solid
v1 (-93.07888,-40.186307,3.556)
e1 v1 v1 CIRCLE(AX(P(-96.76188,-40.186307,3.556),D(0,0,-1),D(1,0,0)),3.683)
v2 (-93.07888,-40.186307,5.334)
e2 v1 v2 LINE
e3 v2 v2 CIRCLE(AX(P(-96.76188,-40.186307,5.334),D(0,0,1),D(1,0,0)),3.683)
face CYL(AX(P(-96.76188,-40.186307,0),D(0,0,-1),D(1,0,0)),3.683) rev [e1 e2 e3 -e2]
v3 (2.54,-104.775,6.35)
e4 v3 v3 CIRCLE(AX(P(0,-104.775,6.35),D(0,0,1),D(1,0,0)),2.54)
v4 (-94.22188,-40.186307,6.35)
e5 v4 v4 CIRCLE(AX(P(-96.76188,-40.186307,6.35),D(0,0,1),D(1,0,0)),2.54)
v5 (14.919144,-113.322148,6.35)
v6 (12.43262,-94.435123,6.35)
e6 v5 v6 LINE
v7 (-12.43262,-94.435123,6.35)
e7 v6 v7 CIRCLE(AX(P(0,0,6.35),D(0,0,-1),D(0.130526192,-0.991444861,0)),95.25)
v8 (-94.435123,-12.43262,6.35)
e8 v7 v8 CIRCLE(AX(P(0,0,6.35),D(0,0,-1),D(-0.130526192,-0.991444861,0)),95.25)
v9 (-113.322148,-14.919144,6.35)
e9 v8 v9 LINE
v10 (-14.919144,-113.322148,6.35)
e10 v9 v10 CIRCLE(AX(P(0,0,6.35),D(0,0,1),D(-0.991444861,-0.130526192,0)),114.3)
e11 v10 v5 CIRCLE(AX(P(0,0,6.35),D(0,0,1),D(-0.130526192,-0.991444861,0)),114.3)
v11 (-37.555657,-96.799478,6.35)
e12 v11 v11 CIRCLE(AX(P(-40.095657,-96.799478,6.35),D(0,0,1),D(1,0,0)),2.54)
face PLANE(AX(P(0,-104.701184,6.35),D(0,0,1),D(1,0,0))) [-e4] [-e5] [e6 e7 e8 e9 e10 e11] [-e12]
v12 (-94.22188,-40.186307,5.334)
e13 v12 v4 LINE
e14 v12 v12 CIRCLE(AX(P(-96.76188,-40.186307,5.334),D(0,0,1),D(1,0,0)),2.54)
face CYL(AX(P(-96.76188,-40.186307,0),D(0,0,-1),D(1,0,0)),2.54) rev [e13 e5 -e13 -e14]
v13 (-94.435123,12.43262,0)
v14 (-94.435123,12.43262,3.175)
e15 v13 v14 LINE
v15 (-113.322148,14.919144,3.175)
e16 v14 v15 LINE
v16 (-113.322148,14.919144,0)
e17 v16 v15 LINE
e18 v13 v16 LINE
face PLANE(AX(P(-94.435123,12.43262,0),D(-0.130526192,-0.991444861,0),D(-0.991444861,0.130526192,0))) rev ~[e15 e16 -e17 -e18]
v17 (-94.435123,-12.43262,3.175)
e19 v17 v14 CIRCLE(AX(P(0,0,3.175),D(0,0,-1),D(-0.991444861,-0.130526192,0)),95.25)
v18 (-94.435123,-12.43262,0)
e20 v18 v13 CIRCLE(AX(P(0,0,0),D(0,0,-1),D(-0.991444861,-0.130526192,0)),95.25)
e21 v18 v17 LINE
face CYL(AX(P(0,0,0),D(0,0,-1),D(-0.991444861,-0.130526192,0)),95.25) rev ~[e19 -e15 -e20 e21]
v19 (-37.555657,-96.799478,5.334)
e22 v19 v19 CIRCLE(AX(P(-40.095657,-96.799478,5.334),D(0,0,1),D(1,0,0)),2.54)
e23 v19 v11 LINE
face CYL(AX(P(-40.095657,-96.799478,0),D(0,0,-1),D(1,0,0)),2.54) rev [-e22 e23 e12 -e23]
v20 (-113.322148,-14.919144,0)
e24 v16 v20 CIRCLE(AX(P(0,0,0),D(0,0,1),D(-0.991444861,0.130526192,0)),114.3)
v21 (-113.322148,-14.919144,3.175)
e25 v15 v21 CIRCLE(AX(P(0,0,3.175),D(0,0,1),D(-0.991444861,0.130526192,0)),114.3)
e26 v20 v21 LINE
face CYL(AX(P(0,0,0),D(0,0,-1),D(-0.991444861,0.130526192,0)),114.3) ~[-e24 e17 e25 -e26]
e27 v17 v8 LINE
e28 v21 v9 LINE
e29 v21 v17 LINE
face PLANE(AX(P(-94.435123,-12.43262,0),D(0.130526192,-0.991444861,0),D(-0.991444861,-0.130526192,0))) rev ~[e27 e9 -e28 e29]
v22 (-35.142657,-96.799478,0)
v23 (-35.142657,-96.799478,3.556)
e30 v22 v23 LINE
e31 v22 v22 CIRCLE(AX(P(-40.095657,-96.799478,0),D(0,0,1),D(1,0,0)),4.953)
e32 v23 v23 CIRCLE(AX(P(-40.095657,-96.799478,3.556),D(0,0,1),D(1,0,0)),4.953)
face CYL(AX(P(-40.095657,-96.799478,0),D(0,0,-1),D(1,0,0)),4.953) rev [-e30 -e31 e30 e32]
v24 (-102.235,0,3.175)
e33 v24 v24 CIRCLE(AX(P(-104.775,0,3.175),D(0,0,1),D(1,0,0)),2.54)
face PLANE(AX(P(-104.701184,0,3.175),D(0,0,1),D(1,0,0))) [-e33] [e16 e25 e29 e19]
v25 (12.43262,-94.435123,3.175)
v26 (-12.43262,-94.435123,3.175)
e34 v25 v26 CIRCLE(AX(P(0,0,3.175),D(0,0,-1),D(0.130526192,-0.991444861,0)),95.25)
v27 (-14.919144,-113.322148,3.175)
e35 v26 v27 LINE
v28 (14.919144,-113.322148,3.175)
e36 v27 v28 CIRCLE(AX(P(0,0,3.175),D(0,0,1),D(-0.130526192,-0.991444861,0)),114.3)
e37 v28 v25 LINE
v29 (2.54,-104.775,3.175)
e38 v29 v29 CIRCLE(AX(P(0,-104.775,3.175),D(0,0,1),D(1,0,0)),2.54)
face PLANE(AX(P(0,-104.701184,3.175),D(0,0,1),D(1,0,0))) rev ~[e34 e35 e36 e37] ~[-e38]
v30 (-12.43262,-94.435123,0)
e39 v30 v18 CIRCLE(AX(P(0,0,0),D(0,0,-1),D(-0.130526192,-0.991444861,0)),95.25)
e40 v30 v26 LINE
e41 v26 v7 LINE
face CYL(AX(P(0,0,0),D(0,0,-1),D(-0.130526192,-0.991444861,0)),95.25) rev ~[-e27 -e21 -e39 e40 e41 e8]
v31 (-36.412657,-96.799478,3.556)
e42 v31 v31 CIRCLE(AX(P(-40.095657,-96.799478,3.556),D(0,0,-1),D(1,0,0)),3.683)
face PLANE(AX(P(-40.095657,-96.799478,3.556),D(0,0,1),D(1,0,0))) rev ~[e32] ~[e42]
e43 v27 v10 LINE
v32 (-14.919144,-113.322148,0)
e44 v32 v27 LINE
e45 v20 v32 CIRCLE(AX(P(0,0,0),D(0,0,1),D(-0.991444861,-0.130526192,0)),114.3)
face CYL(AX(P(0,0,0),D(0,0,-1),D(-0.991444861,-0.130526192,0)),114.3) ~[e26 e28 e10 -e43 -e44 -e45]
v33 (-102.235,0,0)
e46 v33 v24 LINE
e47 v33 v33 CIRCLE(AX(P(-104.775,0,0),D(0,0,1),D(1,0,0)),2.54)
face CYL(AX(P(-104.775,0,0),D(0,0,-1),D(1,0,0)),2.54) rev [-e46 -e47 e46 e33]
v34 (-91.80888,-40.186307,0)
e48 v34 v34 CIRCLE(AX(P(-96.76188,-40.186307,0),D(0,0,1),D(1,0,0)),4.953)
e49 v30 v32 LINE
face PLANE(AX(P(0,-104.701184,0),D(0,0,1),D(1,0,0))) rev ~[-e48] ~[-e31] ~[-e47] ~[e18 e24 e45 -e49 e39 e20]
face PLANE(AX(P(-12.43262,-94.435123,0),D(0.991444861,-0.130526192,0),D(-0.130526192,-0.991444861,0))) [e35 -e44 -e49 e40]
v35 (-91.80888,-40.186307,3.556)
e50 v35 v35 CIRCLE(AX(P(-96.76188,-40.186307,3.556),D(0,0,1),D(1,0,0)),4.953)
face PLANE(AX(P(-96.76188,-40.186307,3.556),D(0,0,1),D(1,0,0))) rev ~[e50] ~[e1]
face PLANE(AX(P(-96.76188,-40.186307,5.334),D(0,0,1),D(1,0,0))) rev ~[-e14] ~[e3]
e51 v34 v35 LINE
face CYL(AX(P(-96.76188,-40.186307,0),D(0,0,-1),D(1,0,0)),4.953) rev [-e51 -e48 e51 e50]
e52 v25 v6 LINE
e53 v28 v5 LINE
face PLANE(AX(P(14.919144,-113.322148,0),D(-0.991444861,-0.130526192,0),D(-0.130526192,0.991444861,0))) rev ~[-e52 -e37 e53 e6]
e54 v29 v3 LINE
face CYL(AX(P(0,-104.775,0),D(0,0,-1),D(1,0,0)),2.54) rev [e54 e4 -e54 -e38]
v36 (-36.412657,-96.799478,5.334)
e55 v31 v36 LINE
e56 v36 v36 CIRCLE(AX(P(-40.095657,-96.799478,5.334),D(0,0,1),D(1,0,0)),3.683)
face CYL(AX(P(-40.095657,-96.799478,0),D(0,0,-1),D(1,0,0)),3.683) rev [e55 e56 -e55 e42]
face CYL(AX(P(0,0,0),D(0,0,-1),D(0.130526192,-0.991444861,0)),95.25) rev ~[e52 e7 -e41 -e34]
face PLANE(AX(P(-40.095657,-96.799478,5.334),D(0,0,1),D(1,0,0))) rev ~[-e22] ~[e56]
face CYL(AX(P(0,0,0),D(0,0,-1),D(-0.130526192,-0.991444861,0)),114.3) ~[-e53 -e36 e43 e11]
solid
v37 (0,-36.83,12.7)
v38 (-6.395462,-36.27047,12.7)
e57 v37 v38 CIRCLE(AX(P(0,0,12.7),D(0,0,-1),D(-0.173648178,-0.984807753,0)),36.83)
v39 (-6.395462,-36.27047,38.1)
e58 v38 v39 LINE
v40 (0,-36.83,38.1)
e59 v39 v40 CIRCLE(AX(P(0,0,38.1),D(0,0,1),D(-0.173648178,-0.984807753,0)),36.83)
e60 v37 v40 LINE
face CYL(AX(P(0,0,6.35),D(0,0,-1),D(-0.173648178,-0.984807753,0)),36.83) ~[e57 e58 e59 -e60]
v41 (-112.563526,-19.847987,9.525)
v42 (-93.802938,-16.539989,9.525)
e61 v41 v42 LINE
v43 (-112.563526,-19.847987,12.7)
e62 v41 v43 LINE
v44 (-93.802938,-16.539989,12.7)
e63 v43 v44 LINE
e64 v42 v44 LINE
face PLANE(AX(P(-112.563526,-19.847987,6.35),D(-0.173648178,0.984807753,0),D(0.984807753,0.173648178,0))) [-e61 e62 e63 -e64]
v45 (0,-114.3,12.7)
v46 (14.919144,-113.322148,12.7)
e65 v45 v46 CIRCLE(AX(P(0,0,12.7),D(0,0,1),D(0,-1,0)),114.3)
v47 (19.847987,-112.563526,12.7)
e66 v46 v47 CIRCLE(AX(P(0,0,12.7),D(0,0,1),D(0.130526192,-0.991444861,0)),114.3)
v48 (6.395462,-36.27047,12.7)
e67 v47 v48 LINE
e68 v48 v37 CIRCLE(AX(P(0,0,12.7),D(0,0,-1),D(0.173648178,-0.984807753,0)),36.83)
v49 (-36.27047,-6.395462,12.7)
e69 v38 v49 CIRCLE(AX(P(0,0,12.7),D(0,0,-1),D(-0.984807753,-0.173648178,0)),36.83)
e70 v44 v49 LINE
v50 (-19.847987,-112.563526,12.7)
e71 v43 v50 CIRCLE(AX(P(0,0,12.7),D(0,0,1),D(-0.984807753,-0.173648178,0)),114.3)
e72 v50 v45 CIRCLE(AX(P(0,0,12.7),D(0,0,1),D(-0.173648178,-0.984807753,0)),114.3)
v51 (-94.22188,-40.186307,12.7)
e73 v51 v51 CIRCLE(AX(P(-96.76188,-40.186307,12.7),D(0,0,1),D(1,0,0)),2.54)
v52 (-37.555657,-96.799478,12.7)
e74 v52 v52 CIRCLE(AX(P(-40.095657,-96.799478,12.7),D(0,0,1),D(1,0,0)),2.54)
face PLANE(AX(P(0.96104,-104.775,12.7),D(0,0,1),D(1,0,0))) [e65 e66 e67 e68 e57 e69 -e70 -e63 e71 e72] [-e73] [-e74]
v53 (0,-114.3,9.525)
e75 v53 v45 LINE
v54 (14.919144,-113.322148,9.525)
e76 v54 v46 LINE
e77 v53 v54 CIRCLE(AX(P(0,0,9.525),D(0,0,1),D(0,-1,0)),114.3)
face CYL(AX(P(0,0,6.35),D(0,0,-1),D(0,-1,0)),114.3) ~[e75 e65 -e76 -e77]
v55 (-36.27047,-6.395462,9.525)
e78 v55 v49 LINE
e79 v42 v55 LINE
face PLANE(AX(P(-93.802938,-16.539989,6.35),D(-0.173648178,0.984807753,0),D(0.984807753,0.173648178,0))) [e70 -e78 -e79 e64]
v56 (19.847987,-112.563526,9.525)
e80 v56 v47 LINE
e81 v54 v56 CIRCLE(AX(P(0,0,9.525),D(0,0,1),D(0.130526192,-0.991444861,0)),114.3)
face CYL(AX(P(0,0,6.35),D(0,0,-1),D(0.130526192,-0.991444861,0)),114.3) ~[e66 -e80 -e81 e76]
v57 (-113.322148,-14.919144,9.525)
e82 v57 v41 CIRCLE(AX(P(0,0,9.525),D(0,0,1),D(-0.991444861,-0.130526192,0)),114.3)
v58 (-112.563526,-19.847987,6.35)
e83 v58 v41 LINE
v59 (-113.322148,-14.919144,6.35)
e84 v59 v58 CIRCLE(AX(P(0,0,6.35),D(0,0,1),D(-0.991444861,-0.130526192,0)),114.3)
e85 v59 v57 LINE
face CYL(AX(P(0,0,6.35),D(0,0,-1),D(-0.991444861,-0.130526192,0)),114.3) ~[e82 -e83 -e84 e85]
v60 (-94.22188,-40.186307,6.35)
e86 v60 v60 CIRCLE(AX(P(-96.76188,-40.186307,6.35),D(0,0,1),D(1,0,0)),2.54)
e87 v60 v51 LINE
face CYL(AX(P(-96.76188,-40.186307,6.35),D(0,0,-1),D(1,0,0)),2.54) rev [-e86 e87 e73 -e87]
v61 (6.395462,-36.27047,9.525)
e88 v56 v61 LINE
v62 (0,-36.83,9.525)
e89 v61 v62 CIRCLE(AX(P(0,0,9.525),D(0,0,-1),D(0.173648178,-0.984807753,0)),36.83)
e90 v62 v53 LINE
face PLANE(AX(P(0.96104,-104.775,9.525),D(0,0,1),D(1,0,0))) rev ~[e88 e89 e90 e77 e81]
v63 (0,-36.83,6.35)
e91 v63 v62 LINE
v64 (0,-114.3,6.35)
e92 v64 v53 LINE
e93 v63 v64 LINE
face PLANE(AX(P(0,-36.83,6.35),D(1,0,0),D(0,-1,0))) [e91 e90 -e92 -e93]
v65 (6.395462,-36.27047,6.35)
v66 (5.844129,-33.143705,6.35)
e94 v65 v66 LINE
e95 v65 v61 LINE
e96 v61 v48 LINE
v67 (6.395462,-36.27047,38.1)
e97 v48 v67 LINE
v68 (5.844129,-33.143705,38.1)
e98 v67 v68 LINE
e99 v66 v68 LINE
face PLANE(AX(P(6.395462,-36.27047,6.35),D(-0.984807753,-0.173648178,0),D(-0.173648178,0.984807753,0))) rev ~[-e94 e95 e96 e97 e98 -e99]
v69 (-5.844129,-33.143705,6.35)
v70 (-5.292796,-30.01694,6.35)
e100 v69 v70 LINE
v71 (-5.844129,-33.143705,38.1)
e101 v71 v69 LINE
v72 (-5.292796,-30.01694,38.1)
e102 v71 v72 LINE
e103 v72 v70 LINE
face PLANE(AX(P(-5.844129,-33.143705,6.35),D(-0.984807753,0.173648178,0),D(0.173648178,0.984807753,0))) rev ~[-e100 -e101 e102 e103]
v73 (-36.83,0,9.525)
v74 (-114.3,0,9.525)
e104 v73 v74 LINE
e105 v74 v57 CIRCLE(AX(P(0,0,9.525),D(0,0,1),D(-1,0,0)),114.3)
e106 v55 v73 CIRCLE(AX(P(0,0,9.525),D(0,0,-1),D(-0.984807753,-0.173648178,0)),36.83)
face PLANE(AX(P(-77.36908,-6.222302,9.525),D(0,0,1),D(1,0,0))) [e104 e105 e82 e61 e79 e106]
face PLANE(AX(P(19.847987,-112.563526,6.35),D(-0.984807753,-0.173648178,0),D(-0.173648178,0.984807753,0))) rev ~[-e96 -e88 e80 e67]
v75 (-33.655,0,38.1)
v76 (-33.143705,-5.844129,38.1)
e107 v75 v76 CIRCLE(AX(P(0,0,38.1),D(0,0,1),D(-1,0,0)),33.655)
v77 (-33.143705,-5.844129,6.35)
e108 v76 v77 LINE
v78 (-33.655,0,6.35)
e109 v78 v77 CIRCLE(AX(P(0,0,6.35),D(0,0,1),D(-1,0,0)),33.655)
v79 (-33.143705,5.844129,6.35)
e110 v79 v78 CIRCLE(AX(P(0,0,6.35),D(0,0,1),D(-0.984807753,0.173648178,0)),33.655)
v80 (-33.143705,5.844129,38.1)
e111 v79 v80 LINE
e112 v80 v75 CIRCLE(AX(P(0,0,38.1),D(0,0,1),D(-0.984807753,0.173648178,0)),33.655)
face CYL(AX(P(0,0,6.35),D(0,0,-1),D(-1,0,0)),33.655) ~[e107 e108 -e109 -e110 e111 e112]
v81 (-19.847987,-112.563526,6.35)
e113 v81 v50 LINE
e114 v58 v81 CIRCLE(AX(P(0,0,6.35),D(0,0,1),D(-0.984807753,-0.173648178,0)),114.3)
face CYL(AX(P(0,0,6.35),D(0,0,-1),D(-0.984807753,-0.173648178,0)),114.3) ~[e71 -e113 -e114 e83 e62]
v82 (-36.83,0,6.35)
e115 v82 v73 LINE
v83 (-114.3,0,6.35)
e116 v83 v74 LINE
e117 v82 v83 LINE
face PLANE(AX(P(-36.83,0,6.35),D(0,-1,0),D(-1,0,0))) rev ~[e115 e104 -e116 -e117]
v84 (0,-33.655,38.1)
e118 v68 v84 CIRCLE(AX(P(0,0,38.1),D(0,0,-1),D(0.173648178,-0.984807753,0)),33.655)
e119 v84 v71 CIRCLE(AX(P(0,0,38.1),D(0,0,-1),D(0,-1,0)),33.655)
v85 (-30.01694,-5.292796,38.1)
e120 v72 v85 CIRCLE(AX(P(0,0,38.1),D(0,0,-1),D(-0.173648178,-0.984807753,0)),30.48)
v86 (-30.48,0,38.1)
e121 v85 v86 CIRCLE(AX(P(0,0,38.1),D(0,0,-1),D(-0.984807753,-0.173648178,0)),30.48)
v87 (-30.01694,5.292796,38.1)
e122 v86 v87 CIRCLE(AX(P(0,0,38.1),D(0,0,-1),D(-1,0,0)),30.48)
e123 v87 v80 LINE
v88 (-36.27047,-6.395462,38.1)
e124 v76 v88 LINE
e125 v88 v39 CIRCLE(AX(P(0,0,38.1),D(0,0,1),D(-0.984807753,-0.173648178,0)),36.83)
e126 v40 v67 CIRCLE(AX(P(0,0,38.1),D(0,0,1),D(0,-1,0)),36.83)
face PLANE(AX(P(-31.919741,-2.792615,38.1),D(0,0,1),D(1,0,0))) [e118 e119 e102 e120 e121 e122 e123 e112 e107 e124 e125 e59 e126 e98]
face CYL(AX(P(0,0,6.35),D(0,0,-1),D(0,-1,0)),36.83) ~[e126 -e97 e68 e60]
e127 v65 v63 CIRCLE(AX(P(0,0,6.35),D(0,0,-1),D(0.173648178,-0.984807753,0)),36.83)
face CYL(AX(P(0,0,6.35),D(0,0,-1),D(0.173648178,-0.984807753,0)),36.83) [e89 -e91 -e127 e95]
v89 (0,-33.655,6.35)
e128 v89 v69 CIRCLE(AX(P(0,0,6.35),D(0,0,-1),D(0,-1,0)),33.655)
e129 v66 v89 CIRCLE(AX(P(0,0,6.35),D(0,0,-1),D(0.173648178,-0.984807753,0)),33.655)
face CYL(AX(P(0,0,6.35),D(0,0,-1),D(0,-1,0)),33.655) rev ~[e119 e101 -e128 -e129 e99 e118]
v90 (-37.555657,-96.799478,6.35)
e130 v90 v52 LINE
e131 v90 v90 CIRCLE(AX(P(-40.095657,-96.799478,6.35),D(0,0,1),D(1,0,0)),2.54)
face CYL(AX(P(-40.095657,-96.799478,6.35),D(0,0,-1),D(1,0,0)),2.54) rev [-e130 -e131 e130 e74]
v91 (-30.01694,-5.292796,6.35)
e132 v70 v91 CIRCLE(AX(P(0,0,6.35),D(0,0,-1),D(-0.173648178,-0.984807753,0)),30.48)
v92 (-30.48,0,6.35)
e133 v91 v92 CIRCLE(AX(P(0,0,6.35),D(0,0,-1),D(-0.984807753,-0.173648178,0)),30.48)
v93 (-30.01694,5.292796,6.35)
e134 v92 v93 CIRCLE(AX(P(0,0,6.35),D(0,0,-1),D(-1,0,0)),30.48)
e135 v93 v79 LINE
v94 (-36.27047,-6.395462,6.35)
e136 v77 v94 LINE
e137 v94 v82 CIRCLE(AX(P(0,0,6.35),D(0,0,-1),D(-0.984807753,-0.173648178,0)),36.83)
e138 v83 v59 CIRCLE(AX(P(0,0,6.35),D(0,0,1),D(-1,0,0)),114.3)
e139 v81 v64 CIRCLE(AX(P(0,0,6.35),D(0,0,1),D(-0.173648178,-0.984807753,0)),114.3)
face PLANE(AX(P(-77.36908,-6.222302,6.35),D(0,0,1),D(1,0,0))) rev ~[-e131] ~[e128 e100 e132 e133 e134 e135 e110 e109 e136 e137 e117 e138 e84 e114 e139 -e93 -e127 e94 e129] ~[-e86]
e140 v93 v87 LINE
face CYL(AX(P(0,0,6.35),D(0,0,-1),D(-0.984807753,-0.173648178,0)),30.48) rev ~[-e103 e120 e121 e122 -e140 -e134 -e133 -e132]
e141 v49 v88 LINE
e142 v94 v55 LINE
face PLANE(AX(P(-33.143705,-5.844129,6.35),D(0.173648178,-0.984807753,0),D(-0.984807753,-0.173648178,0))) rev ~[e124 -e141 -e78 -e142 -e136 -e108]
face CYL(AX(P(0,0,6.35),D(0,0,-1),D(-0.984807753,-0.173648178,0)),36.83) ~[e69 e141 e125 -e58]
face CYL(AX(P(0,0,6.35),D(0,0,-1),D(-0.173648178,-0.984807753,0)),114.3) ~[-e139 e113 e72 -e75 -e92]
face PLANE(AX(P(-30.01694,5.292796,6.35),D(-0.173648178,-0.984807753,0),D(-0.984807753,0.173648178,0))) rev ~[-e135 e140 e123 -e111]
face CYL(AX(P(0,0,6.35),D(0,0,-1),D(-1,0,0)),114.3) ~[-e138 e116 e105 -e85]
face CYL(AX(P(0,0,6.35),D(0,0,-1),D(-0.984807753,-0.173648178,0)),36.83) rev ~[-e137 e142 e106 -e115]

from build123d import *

# Parameters (mm, degrees)
F0_R      = 4.953
F0_R_2    = 3.683
F0_R_3    = 2.54
F1_DEPTH  = 6.35
F2_DEPTH  = 3.175
F3_DEPTH  = 6.35
F4_DEPTH  = 3.175
F5_DEPTH  = 3.556
F6_DEPTH  = 3.556
F7_DEPTH  = 5.334
F8_DEPTH  = 5.334
F9_DEPTH  = 25.4
F10_R     = 2.54
F11_DEPTH = 6.35
F12_DEPTH = 31.75
F13_DEPTH = 6.35
F14_DEPTH = 3.175
F15_DEPTH = 6.35
F16_DEPTH = 3.175


with BuildPart() as f1:
    # F0 (on Top) → F1 (new body)
    with BuildSketch(Plane.XY):
        with BuildLine():
            Line((-94.4351230459, -12.432619809), (-113.322147655, -14.9191437708))
            ThreePointArc((-113.322147655, -14.9191437708), (-80.8223050896, -80.8223050896), (-14.9191437708, -113.322147655))
            Line((-14.9191437708, -113.322147655), (-12.432619809, -94.4351230459))
            ThreePointArc((-12.432619809, -94.4351230459), (-67.351920908, -67.351920908), (-94.4351230459, -12.432619809))
        make_face()
        with Locations((-40.0956566261, -96.7994780189)):
            Circle(F0_R, mode=Mode.SUBTRACT)
        with Locations((-96.7618797455, -40.1863067863)):
            Circle(F0_R, mode=Mode.SUBTRACT)
        with Locations((-96.7618797455, -40.1863067863)):
            Circle(F0_R)
        with Locations((-96.7618797455, -40.1863067863)):
            Circle(F0_R_2, mode=Mode.SUBTRACT)
        with Locations((-96.7618797455, -40.1863067863)):
            Circle(F0_R_2)
        with Locations((-96.7618797455, -40.1863067863)):
            Circle(F0_R_3, mode=Mode.SUBTRACT)
        with Locations((-40.0956566261, -96.7994780189)):
            Circle(F0_R)
        with Locations((-40.0956566261, -96.7994780189)):
            Circle(F0_R_2, mode=Mode.SUBTRACT)
        with Locations((-40.0956566261, -96.7994780189)):
            Circle(F0_R_2)
        with Locations((-40.0956566261, -96.7994780189)):
            Circle(F0_R_3, mode=Mode.SUBTRACT)
    extrude(amount=F1_DEPTH)

    # F0 (on Top) → F2 (join)
    with BuildSketch(Plane.XY):
        with BuildLine():
            Line((-94.4351230459, 12.432619809), (-113.322147655, 14.9191437708))
            ThreePointArc((-113.322147655, 14.9191437708), (-114.3, 0), (-113.322147655, -14.9191437708))
            Line((-113.322147655, -14.9191437708), (-94.4351230459, -12.432619809))
            ThreePointArc((-94.4351230459, -12.432619809), (-95.25, 0), (-94.4351230459, 12.432619809))
        make_face()
        with Locations((-104.775, 0)):
            Circle(F0_R_3, mode=Mode.SUBTRACT)
    extrude(amount=F2_DEPTH)

    # F0 (on Top) → F3 (join)
    with BuildSketch(Plane.XY):
        with BuildLine():
            ThreePointArc((-14.9191437708, -113.322147655), (0, -114.3), (14.9191437708, -113.322147655))
            Line((14.9191437708, -113.322147655), (12.432619809, -94.4351230459))
            ThreePointArc((12.432619809, -94.4351230459), (0, -95.25), (-12.432619809, -94.4351230459))
            Line((-12.432619809, -94.4351230459), (-14.9191437708, -113.322147655))
        make_face()
        with Locations((0, -104.775)):
            Circle(F0_R_3, mode=Mode.SUBTRACT)
    extrude(amount=F3_DEPTH)

    # F0 (on Top) → F4 (cut)
    with BuildSketch(Plane.XY):
        with BuildLine():
            ThreePointArc((-14.9191437708, -113.322147655), (0, -114.3), (14.9191437708, -113.322147655))
            Line((14.9191437708, -113.322147655), (12.432619809, -94.4351230459))
            ThreePointArc((12.432619809, -94.4351230459), (0, -95.25), (-12.432619809, -94.4351230459))
            Line((-12.432619809, -94.4351230459), (-14.9191437708, -113.322147655))
        make_face()
        with Locations((0, -104.775)):
            Circle(F0_R_3, mode=Mode.SUBTRACT)
    extrude(amount=F4_DEPTH, mode=Mode.SUBTRACT)

    # F0 (on Top) → F5 (cut)
    with BuildSketch(Plane.XY):
        with Locations((-40.0956566261, -96.7994780189)):
            Circle(F0_R)
        with Locations((-40.0956566261, -96.7994780189)):
            Circle(F0_R_2, mode=Mode.SUBTRACT)
        with Locations((-40.0956566261, -96.7994780189)):
            Circle(F0_R_2)
        with Locations((-40.0956566261, -96.7994780189)):
            Circle(F0_R_3, mode=Mode.SUBTRACT)
    extrude(amount=F5_DEPTH, mode=Mode.SUBTRACT)

    # F0 (on Top) → F6 (cut)
    with BuildSketch(Plane.XY):
        with Locations((-96.7618797455, -40.1863067863)):
            Circle(F0_R)
        with Locations((-96.7618797455, -40.1863067863)):
            Circle(F0_R_2, mode=Mode.SUBTRACT)
        with Locations((-96.7618797455, -40.1863067863)):
            Circle(F0_R_2)
        with Locations((-96.7618797455, -40.1863067863)):
            Circle(F0_R_3, mode=Mode.SUBTRACT)
    extrude(amount=F6_DEPTH, mode=Mode.SUBTRACT)

    # F0 (on Top) → F7 (cut)
    with BuildSketch(Plane.XY):
        with Locations((-96.7618797455, -40.1863067863)):
            Circle(F0_R_2)
        with Locations((-96.7618797455, -40.1863067863)):
            Circle(F0_R_3, mode=Mode.SUBTRACT)
    extrude(amount=F7_DEPTH, mode=Mode.SUBTRACT)

    # F0 (on Top) → F8 (cut)
    with BuildSketch(Plane.XY):
        with Locations((-40.0956566261, -96.7994780189)):
            Circle(F0_R_2)
        with Locations((-40.0956566261, -96.7994780189)):
            Circle(F0_R_3, mode=Mode.SUBTRACT)
    extrude(amount=F8_DEPTH, mode=Mode.SUBTRACT)

    # F0 (on Top) → F9 (cut)
    with BuildSketch(Plane.XY):
        with Locations((-96.7618797455, -40.1863067863)):
            Circle(F0_R_3)
    extrude(amount=F9_DEPTH, mode=Mode.SUBTRACT)


with BuildPart() as f11:
    # F10 (on face) → F11 (new body)
    with BuildSketch(Plane.XY.offset(6.35)):
        with BuildLine():
            Line((-36.83, 0), (-114.3, 0))
            ThreePointArc((-114.3, 0), (-114.0552749262, -7.475577671), (-113.322147655, -14.9191437708))
            Line((-113.322147655, -14.9191437708), (-94.4351230459, -12.432619809))
            ThreePointArc((-94.4351230459, -12.432619809), (-94.1414338721, -14.4897525346), (-93.8029384744, -16.5399889228))
            Line((-93.8029384744, -16.5399889228), (-36.2704695434, -6.3954623835))
            ThreePointArc((-36.2704695434, -6.3954623835), (-36.6898507307, -3.2099460054), (-36.83, 0))
        make_face()
        with BuildLine():
            Line((-93.8029384744, -16.5399889228), (-112.5635261693, -19.8479867073))
            ThreePointArc((-112.5635261693, -19.8479867073), (-80.8223050896, -80.8223050896), (-19.8479867073, -112.5635261693))
            Line((-19.8479867073, -112.5635261693), (-16.5399889228, -93.8029384744))
            ThreePointArc((-16.5399889228, -93.8029384744), (-67.351920908, -67.351920908), (-93.8029384744, -16.5399889228))
        make_face()
        with Locations((-40.0956566261, -96.7994780189)):
            Circle(F10_R, mode=Mode.SUBTRACT)
        with Locations((-96.7618797455, -40.1863067863)):
            Circle(F10_R, mode=Mode.SUBTRACT)
        with BuildLine():
            ThreePointArc((-6.3954623835, -36.2704695434), (-26.0427427511, -26.0427427511), (-36.2704695434, -6.3954623835))
            Line((-36.2704695434, -6.3954623835), (-93.8029384744, -16.5399889228))
            ThreePointArc((-93.8029384744, -16.5399889228), (-67.351920908, -67.351920908), (-16.5399889228, -93.8029384744))
            Line((-16.5399889228, -93.8029384744), (-6.3954623835, -36.2704695434))
        make_face()
        with BuildLine():
            Line((-33.1437049276, -5.8441294194), (-36.2704695434, -6.3954623835))
            ThreePointArc((-36.2704695434, -6.3954623835), (-26.0427427511, -26.0427427511), (-6.3954623835, -36.2704695434))
            Line((-6.3954623835, -36.2704695434), (-5.8441294194, -33.1437049276))
            ThreePointArc((-5.8441294194, -33.1437049276), (-23.7976787208, -23.7976787208), (-33.1437049276, -5.8441294194))
        make_face()
        with BuildLine():
            Line((-30.0169403118, -5.2927964553), (-33.1437049276, -5.8441294194))
            ThreePointArc((-33.1437049276, -5.8441294194), (-23.7976787208, -23.7976787208), (-5.8441294194, -33.1437049276))
            Line((-5.8441294194, -33.1437049276), (-5.2927964553, -30.0169403118))
            ThreePointArc((-5.2927964553, -30.0169403118), (-21.5526146906, -21.5526146906), (-30.0169403118, -5.2927964553))
        make_face()
        with BuildLine():
            Line((0, -95.25), (0, -36.83))
            ThreePointArc((0, -36.83), (-3.2099460054, -36.6898507307), (-6.3954623835, -36.2704695434))
            Line((-6.3954623835, -36.2704695434), (-16.5399889228, -93.8029384744))
            ThreePointArc((-16.5399889228, -93.8029384744), (-8.3015844967, -94.8875449932), (0, -95.25))
        make_face()
        with BuildLine():
            ThreePointArc((-6.3954623835, -36.2704695434), (-3.2099460054, -36.6898507307), (0, -36.83))
            Line((0, -36.83), (0, -33.655))
            ThreePointArc((0, -33.655), (-2.9332265222, -33.5269325643), (-5.8441294194, -33.1437049276))
            Line((-5.8441294194, -33.1437049276), (-6.3954623835, -36.2704695434))
        make_face()
        with BuildLine():
            Line((-30.48, 0), (-33.655, 0))
            ThreePointArc((-33.655, 0), (-33.5269325643, -2.9332265222), (-33.1437049276, -5.8441294194))
            Line((-33.1437049276, -5.8441294194), (-30.0169403118, -5.2927964553))
            ThreePointArc((-30.0169403118, -5.2927964553), (-30.3640143978, -2.6565070389), (-30.48, 0))
        make_face()
        with BuildLine():
            Line((-94.4351230459, -12.432619809), (-113.322147655, -14.9191437708))
            ThreePointArc((-113.322147655, -14.9191437708), (-112.9697206465, -17.3877030415), (-112.5635261693, -19.8479867073))
            Line((-112.5635261693, -19.8479867073), (-93.8029384744, -16.5399889228))
            ThreePointArc((-93.8029384744, -16.5399889228), (-94.1414338721, -14.4897525346), (-94.4351230459, -12.432619809))
        make_face()
        with BuildLine():
            ThreePointArc((-19.8479867073, -112.5635261693), (-9.9619013961, -113.8650539919), (0, -114.3))
            Line((0, -114.3), (0, -107.315))
            ThreePointArc((0, -107.315), (-2.54, -104.775), (0, -102.235))
            Line((0, -102.235), (0, -95.25))
            ThreePointArc((0, -95.25), (-8.3015844967, -94.8875449932), (-16.5399889228, -93.8029384744))
            Line((-16.5399889228, -93.8029384744), (-19.8479867073, -112.5635261693))
        make_face()
        with BuildLine():
            ThreePointArc((0, -102.235), (-2.54, -104.775), (0, -107.315))
            Line((0, -107.315), (0, -102.235))
        make_face()
    extrude(amount=F11_DEPTH)

    # F10 (on face) → F12 (join)
    with BuildSketch(Plane.XY.offset(6.35)):
        with BuildLine():
            Line((-30.48, 0), (-33.655, 0))
            ThreePointArc((-33.655, 0), (-33.5269325643, -2.9332265222), (-33.1437049276, -5.8441294194))
            Line((-33.1437049276, -5.8441294194), (-30.0169403118, -5.2927964553))
            ThreePointArc((-30.0169403118, -5.2927964553), (-30.3640143978, -2.6565070389), (-30.48, 0))
        make_face()
        with BuildLine():
            Line((-33.1437049276, -5.8441294194), (-36.2704695434, -6.3954623835))
            ThreePointArc((-36.2704695434, -6.3954623835), (-26.0427427511, -26.0427427511), (-6.3954623835, -36.2704695434))
            Line((-6.3954623835, -36.2704695434), (-5.8441294194, -33.1437049276))
            ThreePointArc((-5.8441294194, -33.1437049276), (-23.7976787208, -23.7976787208), (-33.1437049276, -5.8441294194))
        make_face()
        with BuildLine():
            Line((-30.0169403118, -5.2927964553), (-33.1437049276, -5.8441294194))
            ThreePointArc((-33.1437049276, -5.8441294194), (-23.7976787208, -23.7976787208), (-5.8441294194, -33.1437049276))
            Line((-5.8441294194, -33.1437049276), (-5.2927964553, -30.0169403118))
            ThreePointArc((-5.2927964553, -30.0169403118), (-21.5526146906, -21.5526146906), (-30.0169403118, -5.2927964553))
        make_face()
        with BuildLine():
            ThreePointArc((-6.3954623835, -36.2704695434), (-3.2099460054, -36.6898507307), (0, -36.83))
            Line((0, -36.83), (0, -33.655))
            ThreePointArc((0, -33.655), (-2.9332265222, -33.5269325643), (-5.8441294194, -33.1437049276))
            Line((-5.8441294194, -33.1437049276), (-6.3954623835, -36.2704695434))
        make_face()
        with BuildLine():
            Line((-30.0169403118, 5.2927964553), (-33.1437049276, 5.8441294194))
            ThreePointArc((-33.1437049276, 5.8441294194), (-33.5269325643, 2.9332265222), (-33.655, 0))
            Line((-33.655, 0), (-30.48, 0))
            ThreePointArc((-30.48, 0), (-30.3640143978, 2.6565070389), (-30.0169403118, 5.2927964553))
        make_face()
        with BuildLine():
            ThreePointArc((0, -36.83), (3.2099460054, -36.6898507307), (6.3954623835, -36.2704695434))
            Line((6.3954623835, -36.2704695434), (5.8441294194, -33.1437049276))
            ThreePointArc((5.8441294194, -33.1437049276), (2.9332265222, -33.5269325643), (0, -33.655))
            Line((0, -33.655), (0, -36.83))
        make_face()
    extrude(amount=F12_DEPTH)

    # F10 (on face) → F13 (join)
    with BuildSketch(Plane.XY.offset(6.35)):
        with BuildLine():
            Line((0, -102.235), (0, -107.315))
            ThreePointArc((0, -107.315), (1.7960512242, -106.5710512242), (2.54, -104.775))
            ThreePointArc((2.54, -104.775), (1.7960512242, -102.9789487758), (0, -102.235))
        make_face()
        with BuildLine():
            ThreePointArc((0, -114.3), (7.475577671, -114.0552749262), (14.9191437708, -113.322147655))
            Line((14.9191437708, -113.322147655), (12.432619809, -94.4351230459))
            ThreePointArc((12.432619809, -94.4351230459), (6.2296480592, -95.0460624385), (0, -95.25))
            Line((0, -95.25), (0, -102.235))
            ThreePointArc((0, -102.235), (1.7960512242, -102.9789487758), (2.54, -104.775))
            ThreePointArc((2.54, -104.775), (1.7960512242, -106.5710512242), (0, -107.315))
            Line((0, -107.315), (0, -114.3))
        make_face()
        with BuildLine():
            ThreePointArc((14.9191437708, -113.322147655), (17.3877030415, -112.9697206465), (19.8479867073, -112.5635261693))
            Line((19.8479867073, -112.5635261693), (6.3954623835, -36.2704695434))
            ThreePointArc((6.3954623835, -36.2704695434), (3.2099460054, -36.6898507307), (0, -36.83))
            Line((0, -36.83), (0, -95.25))
            ThreePointArc((0, -95.25), (6.2296480592, -95.0460624385), (12.432619809, -94.4351230459))
            Line((12.432619809, -94.4351230459), (14.9191437708, -113.322147655))
        make_face()
    extrude(amount=F13_DEPTH)

    # F10 (on face) → F14 (cut)
    with BuildSketch(Plane.XY.offset(6.35)):
        with BuildLine():
            Line((0, -102.235), (0, -107.315))
            ThreePointArc((0, -107.315), (1.7960512242, -106.5710512242), (2.54, -104.775))
            ThreePointArc((2.54, -104.775), (1.7960512242, -102.9789487758), (0, -102.235))
        make_face()
        with BuildLine():
            ThreePointArc((0, -114.3), (7.475577671, -114.0552749262), (14.9191437708, -113.322147655))
            Line((14.9191437708, -113.322147655), (12.432619809, -94.4351230459))
            ThreePointArc((12.432619809, -94.4351230459), (6.2296480592, -95.0460624385), (0, -95.25))
            Line((0, -95.25), (0, -102.235))
            ThreePointArc((0, -102.235), (1.7960512242, -102.9789487758), (2.54, -104.775))
            ThreePointArc((2.54, -104.775), (1.7960512242, -106.5710512242), (0, -107.315))
            Line((0, -107.315), (0, -114.3))
        make_face()
        with BuildLine():
            ThreePointArc((14.9191437708, -113.322147655), (17.3877030415, -112.9697206465), (19.8479867073, -112.5635261693))
            Line((19.8479867073, -112.5635261693), (6.3954623835, -36.2704695434))
            ThreePointArc((6.3954623835, -36.2704695434), (3.2099460054, -36.6898507307), (0, -36.83))
            Line((0, -36.83), (0, -95.25))
            ThreePointArc((0, -95.25), (6.2296480592, -95.0460624385), (12.432619809, -94.4351230459))
            Line((12.432619809, -94.4351230459), (14.9191437708, -113.322147655))
        make_face()
    extrude(amount=F14_DEPTH, mode=Mode.SUBTRACT)

    # F10 (on face) → F15 (cut)
    with BuildSketch(Plane.XY.offset(6.35)):
        with BuildLine():
            Line((-36.83, 0), (-114.3, 0))
            ThreePointArc((-114.3, 0), (-114.0552749262, -7.475577671), (-113.322147655, -14.9191437708))
            Line((-113.322147655, -14.9191437708), (-94.4351230459, -12.432619809))
            ThreePointArc((-94.4351230459, -12.432619809), (-94.1414338721, -14.4897525346), (-93.8029384744, -16.5399889228))
            Line((-93.8029384744, -16.5399889228), (-36.2704695434, -6.3954623835))
            ThreePointArc((-36.2704695434, -6.3954623835), (-36.6898507307, -3.2099460054), (-36.83, 0))
        make_face()
        with BuildLine():
            Line((-94.4351230459, -12.432619809), (-113.322147655, -14.9191437708))
            ThreePointArc((-113.322147655, -14.9191437708), (-112.9697206465, -17.3877030415), (-112.5635261693, -19.8479867073))
            Line((-112.5635261693, -19.8479867073), (-93.8029384744, -16.5399889228))
            ThreePointArc((-93.8029384744, -16.5399889228), (-94.1414338721, -14.4897525346), (-94.4351230459, -12.432619809))
        make_face()
    extrude(amount=F15_DEPTH, mode=Mode.SUBTRACT)

    # F10 (on face) → F16 (join)
    with BuildSketch(Plane.XY.offset(6.35)):
        with BuildLine():
            Line((-36.83, 0), (-114.3, 0))
            ThreePointArc((-114.3, 0), (-114.0552749262, -7.475577671), (-113.322147655, -14.9191437708))
            Line((-113.322147655, -14.9191437708), (-94.4351230459, -12.432619809))
            ThreePointArc((-94.4351230459, -12.432619809), (-94.1414338721, -14.4897525346), (-93.8029384744, -16.5399889228))
            Line((-93.8029384744, -16.5399889228), (-36.2704695434, -6.3954623835))
            ThreePointArc((-36.2704695434, -6.3954623835), (-36.6898507307, -3.2099460054), (-36.83, 0))
        make_face()
        with BuildLine():
            Line((-94.4351230459, -12.432619809), (-113.322147655, -14.9191437708))
            ThreePointArc((-113.322147655, -14.9191437708), (-112.9697206465, -17.3877030415), (-112.5635261693, -19.8479867073))
            Line((-112.5635261693, -19.8479867073), (-93.8029384744, -16.5399889228))
            ThreePointArc((-93.8029384744, -16.5399889228), (-94.1414338721, -14.4897525346), (-94.4351230459, -12.432619809))
        make_face()
    extrude(amount=F16_DEPTH)


solid = Compound([f1.part, f11.part])
